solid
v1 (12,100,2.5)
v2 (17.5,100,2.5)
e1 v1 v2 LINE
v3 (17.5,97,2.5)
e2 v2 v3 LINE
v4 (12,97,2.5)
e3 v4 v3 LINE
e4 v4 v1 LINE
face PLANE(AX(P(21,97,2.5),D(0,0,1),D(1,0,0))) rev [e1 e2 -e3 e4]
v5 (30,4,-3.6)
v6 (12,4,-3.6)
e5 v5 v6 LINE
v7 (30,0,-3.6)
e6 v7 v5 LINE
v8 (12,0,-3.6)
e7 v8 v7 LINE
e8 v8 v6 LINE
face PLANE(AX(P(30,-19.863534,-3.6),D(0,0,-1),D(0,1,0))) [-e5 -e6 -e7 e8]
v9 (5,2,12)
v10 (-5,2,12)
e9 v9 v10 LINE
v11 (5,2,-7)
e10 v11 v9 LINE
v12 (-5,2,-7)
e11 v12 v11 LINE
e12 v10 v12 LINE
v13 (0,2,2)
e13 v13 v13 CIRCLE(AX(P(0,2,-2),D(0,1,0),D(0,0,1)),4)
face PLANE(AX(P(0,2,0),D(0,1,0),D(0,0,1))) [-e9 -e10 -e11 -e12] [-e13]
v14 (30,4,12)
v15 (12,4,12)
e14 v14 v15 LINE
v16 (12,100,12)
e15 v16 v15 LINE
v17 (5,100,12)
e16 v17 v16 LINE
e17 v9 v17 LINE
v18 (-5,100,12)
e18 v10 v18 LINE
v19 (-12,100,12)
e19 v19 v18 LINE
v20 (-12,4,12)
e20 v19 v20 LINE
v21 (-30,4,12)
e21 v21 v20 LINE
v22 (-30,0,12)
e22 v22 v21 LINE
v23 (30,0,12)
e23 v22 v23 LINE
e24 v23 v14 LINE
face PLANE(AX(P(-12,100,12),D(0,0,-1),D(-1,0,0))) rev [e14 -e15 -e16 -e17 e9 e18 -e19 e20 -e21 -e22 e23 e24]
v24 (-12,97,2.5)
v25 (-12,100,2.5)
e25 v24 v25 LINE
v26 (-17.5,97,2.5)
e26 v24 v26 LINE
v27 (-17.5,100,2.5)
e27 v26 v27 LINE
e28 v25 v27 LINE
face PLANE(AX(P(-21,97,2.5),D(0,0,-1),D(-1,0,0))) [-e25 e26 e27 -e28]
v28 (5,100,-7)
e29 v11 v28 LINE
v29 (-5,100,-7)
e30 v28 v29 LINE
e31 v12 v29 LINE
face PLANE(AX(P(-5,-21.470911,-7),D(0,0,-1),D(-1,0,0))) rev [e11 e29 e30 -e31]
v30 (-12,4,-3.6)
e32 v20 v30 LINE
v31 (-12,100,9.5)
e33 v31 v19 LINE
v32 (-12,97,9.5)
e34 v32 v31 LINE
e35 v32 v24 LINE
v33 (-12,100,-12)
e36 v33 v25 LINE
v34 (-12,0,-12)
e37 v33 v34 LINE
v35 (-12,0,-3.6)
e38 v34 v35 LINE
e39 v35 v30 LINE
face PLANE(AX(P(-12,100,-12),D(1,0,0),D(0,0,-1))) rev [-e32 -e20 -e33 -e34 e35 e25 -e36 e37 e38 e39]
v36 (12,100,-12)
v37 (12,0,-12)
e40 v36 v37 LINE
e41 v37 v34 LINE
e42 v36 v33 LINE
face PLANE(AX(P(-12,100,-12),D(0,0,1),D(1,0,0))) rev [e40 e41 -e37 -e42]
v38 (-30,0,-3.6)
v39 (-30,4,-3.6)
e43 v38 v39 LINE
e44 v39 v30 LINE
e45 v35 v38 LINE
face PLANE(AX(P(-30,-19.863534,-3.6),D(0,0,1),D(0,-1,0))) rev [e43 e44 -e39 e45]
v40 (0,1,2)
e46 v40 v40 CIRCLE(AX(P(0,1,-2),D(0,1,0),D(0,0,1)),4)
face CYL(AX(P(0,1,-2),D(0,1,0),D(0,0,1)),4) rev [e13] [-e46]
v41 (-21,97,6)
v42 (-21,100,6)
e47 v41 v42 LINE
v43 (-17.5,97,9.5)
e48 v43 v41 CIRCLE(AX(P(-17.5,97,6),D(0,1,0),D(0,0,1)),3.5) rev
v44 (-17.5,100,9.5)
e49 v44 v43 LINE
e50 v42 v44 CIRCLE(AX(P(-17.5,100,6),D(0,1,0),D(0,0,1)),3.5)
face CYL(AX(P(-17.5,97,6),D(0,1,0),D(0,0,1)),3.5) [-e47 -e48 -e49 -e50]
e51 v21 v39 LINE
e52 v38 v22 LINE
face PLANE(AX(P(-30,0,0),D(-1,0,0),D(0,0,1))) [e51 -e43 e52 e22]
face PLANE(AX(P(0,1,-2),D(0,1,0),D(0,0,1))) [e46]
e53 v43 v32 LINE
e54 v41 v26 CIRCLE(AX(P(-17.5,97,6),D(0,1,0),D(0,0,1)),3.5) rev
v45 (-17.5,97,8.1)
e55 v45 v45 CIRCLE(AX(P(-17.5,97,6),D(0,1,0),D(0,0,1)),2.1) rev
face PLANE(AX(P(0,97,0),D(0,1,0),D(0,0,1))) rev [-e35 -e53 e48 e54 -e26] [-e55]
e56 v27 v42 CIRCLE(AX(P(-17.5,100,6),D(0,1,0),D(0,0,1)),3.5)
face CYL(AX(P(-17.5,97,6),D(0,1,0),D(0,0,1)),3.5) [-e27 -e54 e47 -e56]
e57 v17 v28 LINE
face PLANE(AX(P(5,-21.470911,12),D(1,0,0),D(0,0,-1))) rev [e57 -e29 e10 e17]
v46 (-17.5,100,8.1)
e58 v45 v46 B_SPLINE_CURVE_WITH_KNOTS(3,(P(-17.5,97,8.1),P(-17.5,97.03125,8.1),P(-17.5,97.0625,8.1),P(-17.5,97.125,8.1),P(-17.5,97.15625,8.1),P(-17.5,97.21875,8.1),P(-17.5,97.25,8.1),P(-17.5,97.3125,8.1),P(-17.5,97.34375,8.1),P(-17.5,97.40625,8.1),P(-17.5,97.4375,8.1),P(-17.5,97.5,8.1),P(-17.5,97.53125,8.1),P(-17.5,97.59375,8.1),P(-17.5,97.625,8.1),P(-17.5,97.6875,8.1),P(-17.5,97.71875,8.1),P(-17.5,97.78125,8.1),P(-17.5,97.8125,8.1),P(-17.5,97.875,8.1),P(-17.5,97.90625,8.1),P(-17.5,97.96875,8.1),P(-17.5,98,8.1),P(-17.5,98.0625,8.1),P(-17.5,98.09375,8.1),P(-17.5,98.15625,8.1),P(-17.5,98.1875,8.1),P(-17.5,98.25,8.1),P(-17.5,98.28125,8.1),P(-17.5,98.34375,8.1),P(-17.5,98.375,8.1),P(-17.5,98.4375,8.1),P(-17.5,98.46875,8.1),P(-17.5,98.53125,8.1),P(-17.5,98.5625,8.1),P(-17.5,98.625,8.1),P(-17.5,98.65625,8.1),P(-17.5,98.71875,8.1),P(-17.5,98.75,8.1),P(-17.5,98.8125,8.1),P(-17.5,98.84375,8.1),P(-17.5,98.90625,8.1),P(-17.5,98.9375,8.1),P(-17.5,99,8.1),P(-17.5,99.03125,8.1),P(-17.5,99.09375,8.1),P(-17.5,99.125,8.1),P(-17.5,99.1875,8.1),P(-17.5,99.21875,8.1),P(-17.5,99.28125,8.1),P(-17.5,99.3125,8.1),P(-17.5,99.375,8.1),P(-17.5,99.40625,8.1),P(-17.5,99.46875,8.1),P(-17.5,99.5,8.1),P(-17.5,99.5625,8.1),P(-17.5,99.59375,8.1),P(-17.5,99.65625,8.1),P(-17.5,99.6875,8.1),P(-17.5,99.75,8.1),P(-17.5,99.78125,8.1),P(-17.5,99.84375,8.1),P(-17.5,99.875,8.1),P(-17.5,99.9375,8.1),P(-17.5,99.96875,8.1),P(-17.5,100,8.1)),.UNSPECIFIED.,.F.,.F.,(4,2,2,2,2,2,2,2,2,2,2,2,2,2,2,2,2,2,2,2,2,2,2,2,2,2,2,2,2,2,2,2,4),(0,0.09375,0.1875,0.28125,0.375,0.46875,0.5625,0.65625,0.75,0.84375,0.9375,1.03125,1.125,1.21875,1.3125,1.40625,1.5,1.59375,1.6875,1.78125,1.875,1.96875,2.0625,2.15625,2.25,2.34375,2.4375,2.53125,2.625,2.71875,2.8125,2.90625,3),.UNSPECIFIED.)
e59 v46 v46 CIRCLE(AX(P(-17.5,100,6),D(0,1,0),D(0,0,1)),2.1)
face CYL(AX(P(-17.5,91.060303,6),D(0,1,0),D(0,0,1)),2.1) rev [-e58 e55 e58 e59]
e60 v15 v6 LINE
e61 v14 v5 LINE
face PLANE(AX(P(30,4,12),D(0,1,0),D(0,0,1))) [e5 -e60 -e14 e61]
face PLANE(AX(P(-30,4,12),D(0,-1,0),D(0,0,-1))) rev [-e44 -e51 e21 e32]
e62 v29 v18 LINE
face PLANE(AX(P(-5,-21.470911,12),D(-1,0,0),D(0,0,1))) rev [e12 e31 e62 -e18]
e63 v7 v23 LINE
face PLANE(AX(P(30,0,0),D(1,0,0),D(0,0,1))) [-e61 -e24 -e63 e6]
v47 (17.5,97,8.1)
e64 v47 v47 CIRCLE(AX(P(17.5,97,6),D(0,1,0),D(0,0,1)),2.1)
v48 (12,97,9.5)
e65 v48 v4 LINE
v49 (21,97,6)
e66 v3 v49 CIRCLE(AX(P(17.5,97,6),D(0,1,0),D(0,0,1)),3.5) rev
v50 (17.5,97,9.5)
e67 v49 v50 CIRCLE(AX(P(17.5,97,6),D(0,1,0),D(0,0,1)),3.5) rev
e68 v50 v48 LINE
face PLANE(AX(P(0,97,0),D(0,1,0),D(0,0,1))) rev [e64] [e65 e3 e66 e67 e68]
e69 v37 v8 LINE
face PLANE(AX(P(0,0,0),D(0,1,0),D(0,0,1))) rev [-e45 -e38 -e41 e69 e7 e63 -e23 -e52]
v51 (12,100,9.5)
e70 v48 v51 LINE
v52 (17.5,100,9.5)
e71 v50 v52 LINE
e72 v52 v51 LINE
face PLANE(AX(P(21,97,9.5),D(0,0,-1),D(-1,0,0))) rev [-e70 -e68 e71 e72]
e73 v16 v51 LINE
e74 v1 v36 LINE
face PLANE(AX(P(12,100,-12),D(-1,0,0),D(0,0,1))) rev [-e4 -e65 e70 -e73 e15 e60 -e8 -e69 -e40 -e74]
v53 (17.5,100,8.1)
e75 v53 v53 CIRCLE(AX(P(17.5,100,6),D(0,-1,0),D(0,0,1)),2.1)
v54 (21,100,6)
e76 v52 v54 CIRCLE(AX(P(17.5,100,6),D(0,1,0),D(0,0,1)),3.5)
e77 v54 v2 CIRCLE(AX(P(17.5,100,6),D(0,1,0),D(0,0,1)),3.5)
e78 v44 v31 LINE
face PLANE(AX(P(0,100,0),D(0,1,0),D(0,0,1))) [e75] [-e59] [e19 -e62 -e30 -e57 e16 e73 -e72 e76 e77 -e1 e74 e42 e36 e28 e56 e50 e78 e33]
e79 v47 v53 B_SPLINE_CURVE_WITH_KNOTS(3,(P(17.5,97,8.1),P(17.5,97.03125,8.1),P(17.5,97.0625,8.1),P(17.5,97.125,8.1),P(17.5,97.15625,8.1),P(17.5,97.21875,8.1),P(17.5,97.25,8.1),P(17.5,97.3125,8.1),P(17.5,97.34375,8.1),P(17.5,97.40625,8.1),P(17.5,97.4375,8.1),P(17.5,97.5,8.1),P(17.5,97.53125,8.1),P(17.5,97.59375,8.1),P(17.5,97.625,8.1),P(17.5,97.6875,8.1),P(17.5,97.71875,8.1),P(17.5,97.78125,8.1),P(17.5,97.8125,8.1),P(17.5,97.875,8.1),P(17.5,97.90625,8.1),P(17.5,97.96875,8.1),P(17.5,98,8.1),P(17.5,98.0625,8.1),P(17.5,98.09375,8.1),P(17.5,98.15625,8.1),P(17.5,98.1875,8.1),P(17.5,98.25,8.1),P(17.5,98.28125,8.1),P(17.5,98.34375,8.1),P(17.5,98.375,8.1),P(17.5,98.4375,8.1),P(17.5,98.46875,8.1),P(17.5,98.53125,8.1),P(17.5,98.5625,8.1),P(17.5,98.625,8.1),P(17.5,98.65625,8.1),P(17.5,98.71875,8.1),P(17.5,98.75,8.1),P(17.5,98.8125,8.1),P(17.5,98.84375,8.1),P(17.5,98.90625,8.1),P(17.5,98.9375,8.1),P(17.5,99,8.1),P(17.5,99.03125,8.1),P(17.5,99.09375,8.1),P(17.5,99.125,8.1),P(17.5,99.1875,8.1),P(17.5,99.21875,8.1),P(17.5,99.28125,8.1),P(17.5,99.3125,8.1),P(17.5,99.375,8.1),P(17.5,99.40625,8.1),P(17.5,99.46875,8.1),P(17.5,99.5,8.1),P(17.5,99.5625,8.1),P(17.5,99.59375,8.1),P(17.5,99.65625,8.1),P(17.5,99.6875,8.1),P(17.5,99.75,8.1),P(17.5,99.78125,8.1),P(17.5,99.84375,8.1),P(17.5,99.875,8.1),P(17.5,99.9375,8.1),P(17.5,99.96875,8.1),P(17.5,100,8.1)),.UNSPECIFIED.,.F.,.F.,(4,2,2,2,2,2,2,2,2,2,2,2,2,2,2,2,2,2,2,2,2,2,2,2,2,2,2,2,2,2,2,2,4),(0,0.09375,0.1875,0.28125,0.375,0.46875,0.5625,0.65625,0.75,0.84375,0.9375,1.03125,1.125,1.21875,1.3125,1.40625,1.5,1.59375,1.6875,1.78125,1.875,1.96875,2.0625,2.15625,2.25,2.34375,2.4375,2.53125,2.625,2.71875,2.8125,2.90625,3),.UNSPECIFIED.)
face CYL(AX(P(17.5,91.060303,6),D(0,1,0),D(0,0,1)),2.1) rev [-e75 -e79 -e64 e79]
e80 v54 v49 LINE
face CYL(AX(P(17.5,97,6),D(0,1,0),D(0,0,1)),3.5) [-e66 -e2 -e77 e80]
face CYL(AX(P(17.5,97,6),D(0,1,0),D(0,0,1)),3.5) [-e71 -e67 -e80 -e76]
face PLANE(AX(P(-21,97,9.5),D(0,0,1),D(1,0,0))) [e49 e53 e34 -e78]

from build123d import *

# Parameters (mm, degrees)
SKETCH1_W            = 24
SKETCH1_H            = 24
BOSS_EXTRUDE1_DEPTH  = 100
SKETCH3_W            = 10
SKETCH3_H            = 19
CUT_EXTRUDE1_DEPTH   = 98
SKETCH6_W            = 24
SKETCH6_H            = 4
BOSS_EXTRUDE3_DEPTH  = 18
SKETCH7_W            = 18
SKETCH7_H            = 8.4
CUT_EXTRUDE3_DEPTH   = 4
SKETCH8_R            = 4
CUT_EXTRUDE4_DEPTH   = 1
SKETCH9_W            = 9
SKETCH9_H            = 7
BOSS_EXTRUDE4_DEPTH  = 3
FILLET1_R            = 3.5
SKETCH10_R           = 2.1
CUT_EXTRUDE5_DEPTH   = 3
FILLET1_OF_MIRROR3_R = 3.5


with BuildPart() as part:
    # Sketch1 → Boss-Extrude1 (new body)
    with BuildSketch(Plane(origin=(0, 0, 0), x_dir=(1, 0, 0), z_dir=(0, 1, 0))):
        Rectangle(SKETCH1_W, SKETCH1_H)
    extrude(amount=BOSS_EXTRUDE1_DEPTH)

    # Sketch3 → Cut-Extrude1 (cut)
    with BuildSketch(Plane(origin=(0, 100, 0), x_dir=(1, 0, 0), z_dir=(0, 1, 0))):
        with Locations((0, -2.5)):
            Rectangle(SKETCH3_W, SKETCH3_H)
    extrude(amount=-CUT_EXTRUDE1_DEPTH, mode=Mode.SUBTRACT)

    # Sketch6 → Boss-Extrude3 (add)
    with BuildSketch(Plane.ZY.offset(12)):
        with Locations((0, 2)):
            Rectangle(SKETCH6_W, SKETCH6_H)
    boss_extrude3 = extrude(amount=BOSS_EXTRUDE3_DEPTH)

    # Sketch7 → Cut-Extrude3 (cut)
    with BuildSketch(Plane(origin=(0, 4, 0), x_dir=(1, 0, 0), z_dir=(0, 1, 0))):
        with Locations((-21, 7.8)):
            Rectangle(SKETCH7_W, SKETCH7_H)
    cut_extrude3 = extrude(amount=-CUT_EXTRUDE3_DEPTH, mode=Mode.SUBTRACT)

    # Mirror2: Boss-Extrude3, Cut-Extrude3 across plane
    add(boss_extrude3.mirror(Plane(origin=(0, 0, 0), x_dir=(0, 0, 1), z_dir=(1, 0, 0))))
    add(cut_extrude3.mirror(Plane(origin=(0, 0, 0), x_dir=(0, 0, 1), z_dir=(1, 0, 0))), mode=Mode.SUBTRACT)

    # Sketch8 → Cut-Extrude4 (cut)
    with BuildSketch(Plane(origin=(0, 2, 0), x_dir=(1, 0, 0), z_dir=(0, 1, 0))):
        with Locations(Location((0, 2, 0), (0, 0, 270))):
            Circle(SKETCH8_R)
    extrude(amount=-CUT_EXTRUDE4_DEPTH, mode=Mode.SUBTRACT)

    # Sketch9 → Boss-Extrude4 (add)
    with BuildSketch(Plane(origin=(0, 100, 0), x_dir=(1, 0, 0), z_dir=(0, 1, 0))):
        with Locations((-16.5, -6)):
            Rectangle(SKETCH9_W, SKETCH9_H)
    boss_extrude4 = extrude(amount=-BOSS_EXTRUDE4_DEPTH)

    # Fillet1
    fillet1_edges = [part.edges().sort_by_distance(p)[0] for p in [
        (-21, 98.5, 2.5),
        (-21, 98.5, 9.5),
    ]]
    fillet(fillet1_edges, radius=FILLET1_R - 0.0001)  # a hair under: the kernel refuses the full size

    # Sketch10 → Cut-Extrude5 (cut)
    with BuildSketch(Plane(origin=(0, 100, 0), x_dir=(1, 0, 0), z_dir=(0, 1, 0))):
        with Locations(Location((-17.5, -6, 0), (0, 0, 270))):
            Circle(SKETCH10_R)
    cut_extrude5 = extrude(amount=-CUT_EXTRUDE5_DEPTH, mode=Mode.SUBTRACT)

    # Mirror3: Boss-Extrude4, Cut-Extrude5 across plane
    add(boss_extrude4.mirror(Plane(origin=(0, 0, 0), x_dir=(0, 0, 1), z_dir=(1, 0, 0))))
    add(cut_extrude5.mirror(Plane(origin=(0, 0, 0), x_dir=(0, 0, 1), z_dir=(1, 0, 0))), mode=Mode.SUBTRACT)

    # Fillet1 of Mirror3
    fillet1_of_mirror3_edges = [part.edges().sort_by_distance(p)[0] for p in [
        (21, 98.5, 2.5),
        (21, 98.5, 9.5),
    ]]
    fillet(fillet1_of_mirror3_edges, radius=FILLET1_OF_MIRROR3_R - 0.0001)  # a hair under: the kernel refuses the full size


solid = part.part
